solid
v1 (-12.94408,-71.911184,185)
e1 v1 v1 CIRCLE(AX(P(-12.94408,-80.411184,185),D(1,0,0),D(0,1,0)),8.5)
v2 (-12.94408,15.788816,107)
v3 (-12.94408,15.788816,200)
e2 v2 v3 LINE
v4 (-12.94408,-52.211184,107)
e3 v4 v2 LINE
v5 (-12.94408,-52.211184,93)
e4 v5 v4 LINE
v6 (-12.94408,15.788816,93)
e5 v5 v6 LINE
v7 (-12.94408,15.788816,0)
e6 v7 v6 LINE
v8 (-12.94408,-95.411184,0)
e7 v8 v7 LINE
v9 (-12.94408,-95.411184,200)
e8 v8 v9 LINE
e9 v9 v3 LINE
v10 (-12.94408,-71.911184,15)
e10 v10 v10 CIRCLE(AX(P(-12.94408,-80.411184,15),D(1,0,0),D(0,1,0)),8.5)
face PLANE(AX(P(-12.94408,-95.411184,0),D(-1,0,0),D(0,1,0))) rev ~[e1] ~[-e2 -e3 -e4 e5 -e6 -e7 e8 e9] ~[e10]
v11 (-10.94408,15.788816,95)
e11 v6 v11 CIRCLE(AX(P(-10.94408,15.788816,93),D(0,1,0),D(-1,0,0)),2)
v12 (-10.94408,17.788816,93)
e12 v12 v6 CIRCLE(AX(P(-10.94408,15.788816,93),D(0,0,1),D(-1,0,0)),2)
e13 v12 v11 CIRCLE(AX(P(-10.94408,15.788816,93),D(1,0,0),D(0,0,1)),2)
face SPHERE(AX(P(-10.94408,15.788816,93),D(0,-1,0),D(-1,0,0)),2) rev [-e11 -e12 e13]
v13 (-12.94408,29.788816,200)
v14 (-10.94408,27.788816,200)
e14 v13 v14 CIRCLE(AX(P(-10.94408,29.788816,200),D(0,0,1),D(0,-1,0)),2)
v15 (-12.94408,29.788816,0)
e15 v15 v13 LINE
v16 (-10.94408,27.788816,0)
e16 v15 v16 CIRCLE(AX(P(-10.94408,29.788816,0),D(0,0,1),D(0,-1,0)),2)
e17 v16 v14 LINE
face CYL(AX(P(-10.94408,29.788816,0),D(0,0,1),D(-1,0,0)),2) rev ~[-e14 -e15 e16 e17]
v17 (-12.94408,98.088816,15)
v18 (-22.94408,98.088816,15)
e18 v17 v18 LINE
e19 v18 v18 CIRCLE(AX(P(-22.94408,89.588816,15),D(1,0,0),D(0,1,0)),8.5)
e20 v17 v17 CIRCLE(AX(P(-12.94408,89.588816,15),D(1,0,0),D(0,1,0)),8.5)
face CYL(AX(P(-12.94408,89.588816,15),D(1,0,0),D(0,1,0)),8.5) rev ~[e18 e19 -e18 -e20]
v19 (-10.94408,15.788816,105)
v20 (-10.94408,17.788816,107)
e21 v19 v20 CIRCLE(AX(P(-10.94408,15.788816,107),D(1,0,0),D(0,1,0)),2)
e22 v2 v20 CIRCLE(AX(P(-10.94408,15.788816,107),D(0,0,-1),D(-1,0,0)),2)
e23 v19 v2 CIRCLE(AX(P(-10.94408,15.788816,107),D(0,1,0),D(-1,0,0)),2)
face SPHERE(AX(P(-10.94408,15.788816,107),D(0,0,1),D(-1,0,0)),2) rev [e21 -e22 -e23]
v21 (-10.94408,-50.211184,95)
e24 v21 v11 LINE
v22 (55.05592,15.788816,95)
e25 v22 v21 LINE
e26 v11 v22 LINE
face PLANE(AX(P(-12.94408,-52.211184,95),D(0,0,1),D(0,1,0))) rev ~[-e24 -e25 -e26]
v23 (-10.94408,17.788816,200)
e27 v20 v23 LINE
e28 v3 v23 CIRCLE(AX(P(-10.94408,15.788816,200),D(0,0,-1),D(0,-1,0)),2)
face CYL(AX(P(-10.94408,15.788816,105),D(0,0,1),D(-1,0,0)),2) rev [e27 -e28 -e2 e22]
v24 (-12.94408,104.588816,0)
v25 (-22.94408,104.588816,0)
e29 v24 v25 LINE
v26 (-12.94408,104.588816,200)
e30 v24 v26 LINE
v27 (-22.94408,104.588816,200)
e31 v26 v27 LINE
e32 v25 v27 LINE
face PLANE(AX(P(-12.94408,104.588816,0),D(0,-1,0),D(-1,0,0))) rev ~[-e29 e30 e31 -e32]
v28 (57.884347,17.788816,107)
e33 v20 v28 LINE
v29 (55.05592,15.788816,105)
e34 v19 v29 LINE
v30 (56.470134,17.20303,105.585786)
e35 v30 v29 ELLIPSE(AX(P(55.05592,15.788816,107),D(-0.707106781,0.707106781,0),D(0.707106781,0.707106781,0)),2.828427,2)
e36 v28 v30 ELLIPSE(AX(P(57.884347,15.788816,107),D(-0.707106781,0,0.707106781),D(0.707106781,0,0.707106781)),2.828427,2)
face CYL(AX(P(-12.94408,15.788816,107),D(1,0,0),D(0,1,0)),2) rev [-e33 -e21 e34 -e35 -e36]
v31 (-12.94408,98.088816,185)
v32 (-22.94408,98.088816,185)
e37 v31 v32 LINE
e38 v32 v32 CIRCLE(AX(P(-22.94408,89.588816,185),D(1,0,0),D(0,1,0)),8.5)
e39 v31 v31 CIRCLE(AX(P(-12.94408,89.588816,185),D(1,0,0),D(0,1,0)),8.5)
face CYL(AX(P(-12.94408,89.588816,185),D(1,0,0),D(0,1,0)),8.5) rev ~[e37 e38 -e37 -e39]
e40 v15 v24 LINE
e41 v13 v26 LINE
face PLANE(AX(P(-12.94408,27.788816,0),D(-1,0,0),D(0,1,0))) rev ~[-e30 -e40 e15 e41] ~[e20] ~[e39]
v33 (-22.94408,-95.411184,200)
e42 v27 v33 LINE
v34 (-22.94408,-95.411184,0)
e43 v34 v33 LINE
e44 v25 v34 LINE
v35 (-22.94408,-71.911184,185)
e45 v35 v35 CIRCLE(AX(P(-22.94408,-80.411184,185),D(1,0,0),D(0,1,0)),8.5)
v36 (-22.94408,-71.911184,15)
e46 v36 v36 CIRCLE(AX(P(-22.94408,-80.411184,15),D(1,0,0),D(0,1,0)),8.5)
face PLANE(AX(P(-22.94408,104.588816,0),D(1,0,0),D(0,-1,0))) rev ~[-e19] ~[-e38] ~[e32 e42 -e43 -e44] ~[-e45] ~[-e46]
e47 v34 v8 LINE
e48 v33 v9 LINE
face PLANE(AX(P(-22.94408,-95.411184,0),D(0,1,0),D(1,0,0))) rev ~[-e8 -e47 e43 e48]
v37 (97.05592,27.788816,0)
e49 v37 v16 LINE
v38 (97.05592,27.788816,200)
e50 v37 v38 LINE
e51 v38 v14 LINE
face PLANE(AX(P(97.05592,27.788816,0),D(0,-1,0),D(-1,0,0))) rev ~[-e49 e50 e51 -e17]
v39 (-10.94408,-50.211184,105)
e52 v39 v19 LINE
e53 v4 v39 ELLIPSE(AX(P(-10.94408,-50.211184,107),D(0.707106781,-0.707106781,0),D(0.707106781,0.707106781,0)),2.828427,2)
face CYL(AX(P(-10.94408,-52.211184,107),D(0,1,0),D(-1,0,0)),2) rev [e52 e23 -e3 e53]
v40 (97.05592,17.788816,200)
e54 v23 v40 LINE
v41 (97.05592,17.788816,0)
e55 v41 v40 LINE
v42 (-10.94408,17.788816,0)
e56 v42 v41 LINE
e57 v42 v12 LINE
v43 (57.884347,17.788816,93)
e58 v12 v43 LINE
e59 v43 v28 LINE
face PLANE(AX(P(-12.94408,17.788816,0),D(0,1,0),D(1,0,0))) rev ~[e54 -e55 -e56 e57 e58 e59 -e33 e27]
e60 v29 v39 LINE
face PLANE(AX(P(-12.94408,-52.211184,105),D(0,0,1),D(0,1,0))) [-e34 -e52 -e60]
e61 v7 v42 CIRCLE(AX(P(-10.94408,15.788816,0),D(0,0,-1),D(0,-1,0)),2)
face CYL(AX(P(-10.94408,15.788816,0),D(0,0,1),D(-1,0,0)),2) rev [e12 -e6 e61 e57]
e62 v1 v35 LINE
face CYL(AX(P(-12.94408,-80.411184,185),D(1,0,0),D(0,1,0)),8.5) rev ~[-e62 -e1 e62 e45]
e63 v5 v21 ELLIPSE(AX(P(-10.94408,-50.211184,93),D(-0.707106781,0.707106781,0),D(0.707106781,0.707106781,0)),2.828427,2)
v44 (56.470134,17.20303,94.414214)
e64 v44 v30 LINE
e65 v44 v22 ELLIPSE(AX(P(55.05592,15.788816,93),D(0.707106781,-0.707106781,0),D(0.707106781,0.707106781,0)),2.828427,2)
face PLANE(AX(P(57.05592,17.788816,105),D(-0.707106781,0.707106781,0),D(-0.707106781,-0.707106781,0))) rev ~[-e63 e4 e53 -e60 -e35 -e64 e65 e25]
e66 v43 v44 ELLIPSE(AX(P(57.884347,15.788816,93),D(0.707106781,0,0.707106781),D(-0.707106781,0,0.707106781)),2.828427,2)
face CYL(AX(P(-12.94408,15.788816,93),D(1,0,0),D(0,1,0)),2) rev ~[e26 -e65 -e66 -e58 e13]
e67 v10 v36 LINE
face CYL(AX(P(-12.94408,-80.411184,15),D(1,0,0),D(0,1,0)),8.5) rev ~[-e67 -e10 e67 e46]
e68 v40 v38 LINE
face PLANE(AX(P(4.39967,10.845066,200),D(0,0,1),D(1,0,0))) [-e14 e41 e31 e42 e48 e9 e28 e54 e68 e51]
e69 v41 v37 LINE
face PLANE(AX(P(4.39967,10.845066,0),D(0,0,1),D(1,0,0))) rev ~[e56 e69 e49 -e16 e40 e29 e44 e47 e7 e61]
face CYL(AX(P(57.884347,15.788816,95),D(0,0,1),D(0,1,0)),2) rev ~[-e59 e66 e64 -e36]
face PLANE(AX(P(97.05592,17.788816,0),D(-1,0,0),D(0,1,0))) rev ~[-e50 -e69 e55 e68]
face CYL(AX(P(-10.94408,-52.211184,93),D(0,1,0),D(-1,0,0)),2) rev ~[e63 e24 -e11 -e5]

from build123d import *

# Parameters (mm, degrees)
F1_DEPTH = 200
F2_R     = 8.5
F3_DEPTH = 10.001
F4_W     = 70
F4_H     = 10
F5_DEPTH = 70
F7_DEPTH = 10
F8_R     = 2


with BuildPart() as f1:
    # F0 (on Top) → F1 (new body)
    with BuildSketch(Plane.XY):
        Polygon((-12.944079712, 104.5888163149), (-22.944079712, 104.5888163149), (-22.944079712, -95.4111836851), (-12.944079712, -95.4111836851), (-12.944079712, 17.7888163149), (97.055920288, 17.7888163149), (97.055920288, 27.7888163149), (-12.944079712, 27.7888163149), align=None)
    extrude(amount=F1_DEPTH)

    # F2 (on face) → F3 (cut, through all)
    with BuildSketch(Plane.YZ.offset(-12.944079712)):
        with Locations((89.5888163149, 185)):
            Circle(F2_R)
        with Locations((89.5888163149, 15)):
            Circle(F2_R)
        with Locations((-80.4111836851, 15)):
            Circle(F2_R)
        with Locations((-80.4111836851, 185)):
            Circle(F2_R)
    extrude(amount=-F3_DEPTH, mode=Mode.SUBTRACT)

    # F4 (on face) → F5 (join)
    with BuildSketch(Plane.YZ.offset(-12.944079712)):
        with Locations((-17.2111836851, 100)):
            Rectangle(F4_W, F4_H)
    extrude(amount=F5_DEPTH)

    # F6 (on face) → F7 (cut)
    with BuildSketch(Plane.XY.offset(105)):
        Polygon((57.055920288, 17.7888163149), (-12.944079712, -52.2111836851), (57.055920288, -52.2111836851), align=None)
    extrude(amount=-F7_DEPTH, mode=Mode.SUBTRACT)

    # F8
    f8_edges = [f1.edges().sort_by_distance(p)[0] for p in [
        (-12.94408, 17.788816, 152.5),
        (-12.94408, -17.211184, 105),
        (-12.94408, -17.211184, 95),
        (-12.94408, 17.788816, 47.5),
        (-12.94408, 27.788816, 100),
        (57.05592, 17.788816, 100),
        (22.05592, 17.788816, 105),
        (22.05592, 17.788816, 95),
    ]]
    fillet(f8_edges, radius=F8_R)


solid = f1.part
